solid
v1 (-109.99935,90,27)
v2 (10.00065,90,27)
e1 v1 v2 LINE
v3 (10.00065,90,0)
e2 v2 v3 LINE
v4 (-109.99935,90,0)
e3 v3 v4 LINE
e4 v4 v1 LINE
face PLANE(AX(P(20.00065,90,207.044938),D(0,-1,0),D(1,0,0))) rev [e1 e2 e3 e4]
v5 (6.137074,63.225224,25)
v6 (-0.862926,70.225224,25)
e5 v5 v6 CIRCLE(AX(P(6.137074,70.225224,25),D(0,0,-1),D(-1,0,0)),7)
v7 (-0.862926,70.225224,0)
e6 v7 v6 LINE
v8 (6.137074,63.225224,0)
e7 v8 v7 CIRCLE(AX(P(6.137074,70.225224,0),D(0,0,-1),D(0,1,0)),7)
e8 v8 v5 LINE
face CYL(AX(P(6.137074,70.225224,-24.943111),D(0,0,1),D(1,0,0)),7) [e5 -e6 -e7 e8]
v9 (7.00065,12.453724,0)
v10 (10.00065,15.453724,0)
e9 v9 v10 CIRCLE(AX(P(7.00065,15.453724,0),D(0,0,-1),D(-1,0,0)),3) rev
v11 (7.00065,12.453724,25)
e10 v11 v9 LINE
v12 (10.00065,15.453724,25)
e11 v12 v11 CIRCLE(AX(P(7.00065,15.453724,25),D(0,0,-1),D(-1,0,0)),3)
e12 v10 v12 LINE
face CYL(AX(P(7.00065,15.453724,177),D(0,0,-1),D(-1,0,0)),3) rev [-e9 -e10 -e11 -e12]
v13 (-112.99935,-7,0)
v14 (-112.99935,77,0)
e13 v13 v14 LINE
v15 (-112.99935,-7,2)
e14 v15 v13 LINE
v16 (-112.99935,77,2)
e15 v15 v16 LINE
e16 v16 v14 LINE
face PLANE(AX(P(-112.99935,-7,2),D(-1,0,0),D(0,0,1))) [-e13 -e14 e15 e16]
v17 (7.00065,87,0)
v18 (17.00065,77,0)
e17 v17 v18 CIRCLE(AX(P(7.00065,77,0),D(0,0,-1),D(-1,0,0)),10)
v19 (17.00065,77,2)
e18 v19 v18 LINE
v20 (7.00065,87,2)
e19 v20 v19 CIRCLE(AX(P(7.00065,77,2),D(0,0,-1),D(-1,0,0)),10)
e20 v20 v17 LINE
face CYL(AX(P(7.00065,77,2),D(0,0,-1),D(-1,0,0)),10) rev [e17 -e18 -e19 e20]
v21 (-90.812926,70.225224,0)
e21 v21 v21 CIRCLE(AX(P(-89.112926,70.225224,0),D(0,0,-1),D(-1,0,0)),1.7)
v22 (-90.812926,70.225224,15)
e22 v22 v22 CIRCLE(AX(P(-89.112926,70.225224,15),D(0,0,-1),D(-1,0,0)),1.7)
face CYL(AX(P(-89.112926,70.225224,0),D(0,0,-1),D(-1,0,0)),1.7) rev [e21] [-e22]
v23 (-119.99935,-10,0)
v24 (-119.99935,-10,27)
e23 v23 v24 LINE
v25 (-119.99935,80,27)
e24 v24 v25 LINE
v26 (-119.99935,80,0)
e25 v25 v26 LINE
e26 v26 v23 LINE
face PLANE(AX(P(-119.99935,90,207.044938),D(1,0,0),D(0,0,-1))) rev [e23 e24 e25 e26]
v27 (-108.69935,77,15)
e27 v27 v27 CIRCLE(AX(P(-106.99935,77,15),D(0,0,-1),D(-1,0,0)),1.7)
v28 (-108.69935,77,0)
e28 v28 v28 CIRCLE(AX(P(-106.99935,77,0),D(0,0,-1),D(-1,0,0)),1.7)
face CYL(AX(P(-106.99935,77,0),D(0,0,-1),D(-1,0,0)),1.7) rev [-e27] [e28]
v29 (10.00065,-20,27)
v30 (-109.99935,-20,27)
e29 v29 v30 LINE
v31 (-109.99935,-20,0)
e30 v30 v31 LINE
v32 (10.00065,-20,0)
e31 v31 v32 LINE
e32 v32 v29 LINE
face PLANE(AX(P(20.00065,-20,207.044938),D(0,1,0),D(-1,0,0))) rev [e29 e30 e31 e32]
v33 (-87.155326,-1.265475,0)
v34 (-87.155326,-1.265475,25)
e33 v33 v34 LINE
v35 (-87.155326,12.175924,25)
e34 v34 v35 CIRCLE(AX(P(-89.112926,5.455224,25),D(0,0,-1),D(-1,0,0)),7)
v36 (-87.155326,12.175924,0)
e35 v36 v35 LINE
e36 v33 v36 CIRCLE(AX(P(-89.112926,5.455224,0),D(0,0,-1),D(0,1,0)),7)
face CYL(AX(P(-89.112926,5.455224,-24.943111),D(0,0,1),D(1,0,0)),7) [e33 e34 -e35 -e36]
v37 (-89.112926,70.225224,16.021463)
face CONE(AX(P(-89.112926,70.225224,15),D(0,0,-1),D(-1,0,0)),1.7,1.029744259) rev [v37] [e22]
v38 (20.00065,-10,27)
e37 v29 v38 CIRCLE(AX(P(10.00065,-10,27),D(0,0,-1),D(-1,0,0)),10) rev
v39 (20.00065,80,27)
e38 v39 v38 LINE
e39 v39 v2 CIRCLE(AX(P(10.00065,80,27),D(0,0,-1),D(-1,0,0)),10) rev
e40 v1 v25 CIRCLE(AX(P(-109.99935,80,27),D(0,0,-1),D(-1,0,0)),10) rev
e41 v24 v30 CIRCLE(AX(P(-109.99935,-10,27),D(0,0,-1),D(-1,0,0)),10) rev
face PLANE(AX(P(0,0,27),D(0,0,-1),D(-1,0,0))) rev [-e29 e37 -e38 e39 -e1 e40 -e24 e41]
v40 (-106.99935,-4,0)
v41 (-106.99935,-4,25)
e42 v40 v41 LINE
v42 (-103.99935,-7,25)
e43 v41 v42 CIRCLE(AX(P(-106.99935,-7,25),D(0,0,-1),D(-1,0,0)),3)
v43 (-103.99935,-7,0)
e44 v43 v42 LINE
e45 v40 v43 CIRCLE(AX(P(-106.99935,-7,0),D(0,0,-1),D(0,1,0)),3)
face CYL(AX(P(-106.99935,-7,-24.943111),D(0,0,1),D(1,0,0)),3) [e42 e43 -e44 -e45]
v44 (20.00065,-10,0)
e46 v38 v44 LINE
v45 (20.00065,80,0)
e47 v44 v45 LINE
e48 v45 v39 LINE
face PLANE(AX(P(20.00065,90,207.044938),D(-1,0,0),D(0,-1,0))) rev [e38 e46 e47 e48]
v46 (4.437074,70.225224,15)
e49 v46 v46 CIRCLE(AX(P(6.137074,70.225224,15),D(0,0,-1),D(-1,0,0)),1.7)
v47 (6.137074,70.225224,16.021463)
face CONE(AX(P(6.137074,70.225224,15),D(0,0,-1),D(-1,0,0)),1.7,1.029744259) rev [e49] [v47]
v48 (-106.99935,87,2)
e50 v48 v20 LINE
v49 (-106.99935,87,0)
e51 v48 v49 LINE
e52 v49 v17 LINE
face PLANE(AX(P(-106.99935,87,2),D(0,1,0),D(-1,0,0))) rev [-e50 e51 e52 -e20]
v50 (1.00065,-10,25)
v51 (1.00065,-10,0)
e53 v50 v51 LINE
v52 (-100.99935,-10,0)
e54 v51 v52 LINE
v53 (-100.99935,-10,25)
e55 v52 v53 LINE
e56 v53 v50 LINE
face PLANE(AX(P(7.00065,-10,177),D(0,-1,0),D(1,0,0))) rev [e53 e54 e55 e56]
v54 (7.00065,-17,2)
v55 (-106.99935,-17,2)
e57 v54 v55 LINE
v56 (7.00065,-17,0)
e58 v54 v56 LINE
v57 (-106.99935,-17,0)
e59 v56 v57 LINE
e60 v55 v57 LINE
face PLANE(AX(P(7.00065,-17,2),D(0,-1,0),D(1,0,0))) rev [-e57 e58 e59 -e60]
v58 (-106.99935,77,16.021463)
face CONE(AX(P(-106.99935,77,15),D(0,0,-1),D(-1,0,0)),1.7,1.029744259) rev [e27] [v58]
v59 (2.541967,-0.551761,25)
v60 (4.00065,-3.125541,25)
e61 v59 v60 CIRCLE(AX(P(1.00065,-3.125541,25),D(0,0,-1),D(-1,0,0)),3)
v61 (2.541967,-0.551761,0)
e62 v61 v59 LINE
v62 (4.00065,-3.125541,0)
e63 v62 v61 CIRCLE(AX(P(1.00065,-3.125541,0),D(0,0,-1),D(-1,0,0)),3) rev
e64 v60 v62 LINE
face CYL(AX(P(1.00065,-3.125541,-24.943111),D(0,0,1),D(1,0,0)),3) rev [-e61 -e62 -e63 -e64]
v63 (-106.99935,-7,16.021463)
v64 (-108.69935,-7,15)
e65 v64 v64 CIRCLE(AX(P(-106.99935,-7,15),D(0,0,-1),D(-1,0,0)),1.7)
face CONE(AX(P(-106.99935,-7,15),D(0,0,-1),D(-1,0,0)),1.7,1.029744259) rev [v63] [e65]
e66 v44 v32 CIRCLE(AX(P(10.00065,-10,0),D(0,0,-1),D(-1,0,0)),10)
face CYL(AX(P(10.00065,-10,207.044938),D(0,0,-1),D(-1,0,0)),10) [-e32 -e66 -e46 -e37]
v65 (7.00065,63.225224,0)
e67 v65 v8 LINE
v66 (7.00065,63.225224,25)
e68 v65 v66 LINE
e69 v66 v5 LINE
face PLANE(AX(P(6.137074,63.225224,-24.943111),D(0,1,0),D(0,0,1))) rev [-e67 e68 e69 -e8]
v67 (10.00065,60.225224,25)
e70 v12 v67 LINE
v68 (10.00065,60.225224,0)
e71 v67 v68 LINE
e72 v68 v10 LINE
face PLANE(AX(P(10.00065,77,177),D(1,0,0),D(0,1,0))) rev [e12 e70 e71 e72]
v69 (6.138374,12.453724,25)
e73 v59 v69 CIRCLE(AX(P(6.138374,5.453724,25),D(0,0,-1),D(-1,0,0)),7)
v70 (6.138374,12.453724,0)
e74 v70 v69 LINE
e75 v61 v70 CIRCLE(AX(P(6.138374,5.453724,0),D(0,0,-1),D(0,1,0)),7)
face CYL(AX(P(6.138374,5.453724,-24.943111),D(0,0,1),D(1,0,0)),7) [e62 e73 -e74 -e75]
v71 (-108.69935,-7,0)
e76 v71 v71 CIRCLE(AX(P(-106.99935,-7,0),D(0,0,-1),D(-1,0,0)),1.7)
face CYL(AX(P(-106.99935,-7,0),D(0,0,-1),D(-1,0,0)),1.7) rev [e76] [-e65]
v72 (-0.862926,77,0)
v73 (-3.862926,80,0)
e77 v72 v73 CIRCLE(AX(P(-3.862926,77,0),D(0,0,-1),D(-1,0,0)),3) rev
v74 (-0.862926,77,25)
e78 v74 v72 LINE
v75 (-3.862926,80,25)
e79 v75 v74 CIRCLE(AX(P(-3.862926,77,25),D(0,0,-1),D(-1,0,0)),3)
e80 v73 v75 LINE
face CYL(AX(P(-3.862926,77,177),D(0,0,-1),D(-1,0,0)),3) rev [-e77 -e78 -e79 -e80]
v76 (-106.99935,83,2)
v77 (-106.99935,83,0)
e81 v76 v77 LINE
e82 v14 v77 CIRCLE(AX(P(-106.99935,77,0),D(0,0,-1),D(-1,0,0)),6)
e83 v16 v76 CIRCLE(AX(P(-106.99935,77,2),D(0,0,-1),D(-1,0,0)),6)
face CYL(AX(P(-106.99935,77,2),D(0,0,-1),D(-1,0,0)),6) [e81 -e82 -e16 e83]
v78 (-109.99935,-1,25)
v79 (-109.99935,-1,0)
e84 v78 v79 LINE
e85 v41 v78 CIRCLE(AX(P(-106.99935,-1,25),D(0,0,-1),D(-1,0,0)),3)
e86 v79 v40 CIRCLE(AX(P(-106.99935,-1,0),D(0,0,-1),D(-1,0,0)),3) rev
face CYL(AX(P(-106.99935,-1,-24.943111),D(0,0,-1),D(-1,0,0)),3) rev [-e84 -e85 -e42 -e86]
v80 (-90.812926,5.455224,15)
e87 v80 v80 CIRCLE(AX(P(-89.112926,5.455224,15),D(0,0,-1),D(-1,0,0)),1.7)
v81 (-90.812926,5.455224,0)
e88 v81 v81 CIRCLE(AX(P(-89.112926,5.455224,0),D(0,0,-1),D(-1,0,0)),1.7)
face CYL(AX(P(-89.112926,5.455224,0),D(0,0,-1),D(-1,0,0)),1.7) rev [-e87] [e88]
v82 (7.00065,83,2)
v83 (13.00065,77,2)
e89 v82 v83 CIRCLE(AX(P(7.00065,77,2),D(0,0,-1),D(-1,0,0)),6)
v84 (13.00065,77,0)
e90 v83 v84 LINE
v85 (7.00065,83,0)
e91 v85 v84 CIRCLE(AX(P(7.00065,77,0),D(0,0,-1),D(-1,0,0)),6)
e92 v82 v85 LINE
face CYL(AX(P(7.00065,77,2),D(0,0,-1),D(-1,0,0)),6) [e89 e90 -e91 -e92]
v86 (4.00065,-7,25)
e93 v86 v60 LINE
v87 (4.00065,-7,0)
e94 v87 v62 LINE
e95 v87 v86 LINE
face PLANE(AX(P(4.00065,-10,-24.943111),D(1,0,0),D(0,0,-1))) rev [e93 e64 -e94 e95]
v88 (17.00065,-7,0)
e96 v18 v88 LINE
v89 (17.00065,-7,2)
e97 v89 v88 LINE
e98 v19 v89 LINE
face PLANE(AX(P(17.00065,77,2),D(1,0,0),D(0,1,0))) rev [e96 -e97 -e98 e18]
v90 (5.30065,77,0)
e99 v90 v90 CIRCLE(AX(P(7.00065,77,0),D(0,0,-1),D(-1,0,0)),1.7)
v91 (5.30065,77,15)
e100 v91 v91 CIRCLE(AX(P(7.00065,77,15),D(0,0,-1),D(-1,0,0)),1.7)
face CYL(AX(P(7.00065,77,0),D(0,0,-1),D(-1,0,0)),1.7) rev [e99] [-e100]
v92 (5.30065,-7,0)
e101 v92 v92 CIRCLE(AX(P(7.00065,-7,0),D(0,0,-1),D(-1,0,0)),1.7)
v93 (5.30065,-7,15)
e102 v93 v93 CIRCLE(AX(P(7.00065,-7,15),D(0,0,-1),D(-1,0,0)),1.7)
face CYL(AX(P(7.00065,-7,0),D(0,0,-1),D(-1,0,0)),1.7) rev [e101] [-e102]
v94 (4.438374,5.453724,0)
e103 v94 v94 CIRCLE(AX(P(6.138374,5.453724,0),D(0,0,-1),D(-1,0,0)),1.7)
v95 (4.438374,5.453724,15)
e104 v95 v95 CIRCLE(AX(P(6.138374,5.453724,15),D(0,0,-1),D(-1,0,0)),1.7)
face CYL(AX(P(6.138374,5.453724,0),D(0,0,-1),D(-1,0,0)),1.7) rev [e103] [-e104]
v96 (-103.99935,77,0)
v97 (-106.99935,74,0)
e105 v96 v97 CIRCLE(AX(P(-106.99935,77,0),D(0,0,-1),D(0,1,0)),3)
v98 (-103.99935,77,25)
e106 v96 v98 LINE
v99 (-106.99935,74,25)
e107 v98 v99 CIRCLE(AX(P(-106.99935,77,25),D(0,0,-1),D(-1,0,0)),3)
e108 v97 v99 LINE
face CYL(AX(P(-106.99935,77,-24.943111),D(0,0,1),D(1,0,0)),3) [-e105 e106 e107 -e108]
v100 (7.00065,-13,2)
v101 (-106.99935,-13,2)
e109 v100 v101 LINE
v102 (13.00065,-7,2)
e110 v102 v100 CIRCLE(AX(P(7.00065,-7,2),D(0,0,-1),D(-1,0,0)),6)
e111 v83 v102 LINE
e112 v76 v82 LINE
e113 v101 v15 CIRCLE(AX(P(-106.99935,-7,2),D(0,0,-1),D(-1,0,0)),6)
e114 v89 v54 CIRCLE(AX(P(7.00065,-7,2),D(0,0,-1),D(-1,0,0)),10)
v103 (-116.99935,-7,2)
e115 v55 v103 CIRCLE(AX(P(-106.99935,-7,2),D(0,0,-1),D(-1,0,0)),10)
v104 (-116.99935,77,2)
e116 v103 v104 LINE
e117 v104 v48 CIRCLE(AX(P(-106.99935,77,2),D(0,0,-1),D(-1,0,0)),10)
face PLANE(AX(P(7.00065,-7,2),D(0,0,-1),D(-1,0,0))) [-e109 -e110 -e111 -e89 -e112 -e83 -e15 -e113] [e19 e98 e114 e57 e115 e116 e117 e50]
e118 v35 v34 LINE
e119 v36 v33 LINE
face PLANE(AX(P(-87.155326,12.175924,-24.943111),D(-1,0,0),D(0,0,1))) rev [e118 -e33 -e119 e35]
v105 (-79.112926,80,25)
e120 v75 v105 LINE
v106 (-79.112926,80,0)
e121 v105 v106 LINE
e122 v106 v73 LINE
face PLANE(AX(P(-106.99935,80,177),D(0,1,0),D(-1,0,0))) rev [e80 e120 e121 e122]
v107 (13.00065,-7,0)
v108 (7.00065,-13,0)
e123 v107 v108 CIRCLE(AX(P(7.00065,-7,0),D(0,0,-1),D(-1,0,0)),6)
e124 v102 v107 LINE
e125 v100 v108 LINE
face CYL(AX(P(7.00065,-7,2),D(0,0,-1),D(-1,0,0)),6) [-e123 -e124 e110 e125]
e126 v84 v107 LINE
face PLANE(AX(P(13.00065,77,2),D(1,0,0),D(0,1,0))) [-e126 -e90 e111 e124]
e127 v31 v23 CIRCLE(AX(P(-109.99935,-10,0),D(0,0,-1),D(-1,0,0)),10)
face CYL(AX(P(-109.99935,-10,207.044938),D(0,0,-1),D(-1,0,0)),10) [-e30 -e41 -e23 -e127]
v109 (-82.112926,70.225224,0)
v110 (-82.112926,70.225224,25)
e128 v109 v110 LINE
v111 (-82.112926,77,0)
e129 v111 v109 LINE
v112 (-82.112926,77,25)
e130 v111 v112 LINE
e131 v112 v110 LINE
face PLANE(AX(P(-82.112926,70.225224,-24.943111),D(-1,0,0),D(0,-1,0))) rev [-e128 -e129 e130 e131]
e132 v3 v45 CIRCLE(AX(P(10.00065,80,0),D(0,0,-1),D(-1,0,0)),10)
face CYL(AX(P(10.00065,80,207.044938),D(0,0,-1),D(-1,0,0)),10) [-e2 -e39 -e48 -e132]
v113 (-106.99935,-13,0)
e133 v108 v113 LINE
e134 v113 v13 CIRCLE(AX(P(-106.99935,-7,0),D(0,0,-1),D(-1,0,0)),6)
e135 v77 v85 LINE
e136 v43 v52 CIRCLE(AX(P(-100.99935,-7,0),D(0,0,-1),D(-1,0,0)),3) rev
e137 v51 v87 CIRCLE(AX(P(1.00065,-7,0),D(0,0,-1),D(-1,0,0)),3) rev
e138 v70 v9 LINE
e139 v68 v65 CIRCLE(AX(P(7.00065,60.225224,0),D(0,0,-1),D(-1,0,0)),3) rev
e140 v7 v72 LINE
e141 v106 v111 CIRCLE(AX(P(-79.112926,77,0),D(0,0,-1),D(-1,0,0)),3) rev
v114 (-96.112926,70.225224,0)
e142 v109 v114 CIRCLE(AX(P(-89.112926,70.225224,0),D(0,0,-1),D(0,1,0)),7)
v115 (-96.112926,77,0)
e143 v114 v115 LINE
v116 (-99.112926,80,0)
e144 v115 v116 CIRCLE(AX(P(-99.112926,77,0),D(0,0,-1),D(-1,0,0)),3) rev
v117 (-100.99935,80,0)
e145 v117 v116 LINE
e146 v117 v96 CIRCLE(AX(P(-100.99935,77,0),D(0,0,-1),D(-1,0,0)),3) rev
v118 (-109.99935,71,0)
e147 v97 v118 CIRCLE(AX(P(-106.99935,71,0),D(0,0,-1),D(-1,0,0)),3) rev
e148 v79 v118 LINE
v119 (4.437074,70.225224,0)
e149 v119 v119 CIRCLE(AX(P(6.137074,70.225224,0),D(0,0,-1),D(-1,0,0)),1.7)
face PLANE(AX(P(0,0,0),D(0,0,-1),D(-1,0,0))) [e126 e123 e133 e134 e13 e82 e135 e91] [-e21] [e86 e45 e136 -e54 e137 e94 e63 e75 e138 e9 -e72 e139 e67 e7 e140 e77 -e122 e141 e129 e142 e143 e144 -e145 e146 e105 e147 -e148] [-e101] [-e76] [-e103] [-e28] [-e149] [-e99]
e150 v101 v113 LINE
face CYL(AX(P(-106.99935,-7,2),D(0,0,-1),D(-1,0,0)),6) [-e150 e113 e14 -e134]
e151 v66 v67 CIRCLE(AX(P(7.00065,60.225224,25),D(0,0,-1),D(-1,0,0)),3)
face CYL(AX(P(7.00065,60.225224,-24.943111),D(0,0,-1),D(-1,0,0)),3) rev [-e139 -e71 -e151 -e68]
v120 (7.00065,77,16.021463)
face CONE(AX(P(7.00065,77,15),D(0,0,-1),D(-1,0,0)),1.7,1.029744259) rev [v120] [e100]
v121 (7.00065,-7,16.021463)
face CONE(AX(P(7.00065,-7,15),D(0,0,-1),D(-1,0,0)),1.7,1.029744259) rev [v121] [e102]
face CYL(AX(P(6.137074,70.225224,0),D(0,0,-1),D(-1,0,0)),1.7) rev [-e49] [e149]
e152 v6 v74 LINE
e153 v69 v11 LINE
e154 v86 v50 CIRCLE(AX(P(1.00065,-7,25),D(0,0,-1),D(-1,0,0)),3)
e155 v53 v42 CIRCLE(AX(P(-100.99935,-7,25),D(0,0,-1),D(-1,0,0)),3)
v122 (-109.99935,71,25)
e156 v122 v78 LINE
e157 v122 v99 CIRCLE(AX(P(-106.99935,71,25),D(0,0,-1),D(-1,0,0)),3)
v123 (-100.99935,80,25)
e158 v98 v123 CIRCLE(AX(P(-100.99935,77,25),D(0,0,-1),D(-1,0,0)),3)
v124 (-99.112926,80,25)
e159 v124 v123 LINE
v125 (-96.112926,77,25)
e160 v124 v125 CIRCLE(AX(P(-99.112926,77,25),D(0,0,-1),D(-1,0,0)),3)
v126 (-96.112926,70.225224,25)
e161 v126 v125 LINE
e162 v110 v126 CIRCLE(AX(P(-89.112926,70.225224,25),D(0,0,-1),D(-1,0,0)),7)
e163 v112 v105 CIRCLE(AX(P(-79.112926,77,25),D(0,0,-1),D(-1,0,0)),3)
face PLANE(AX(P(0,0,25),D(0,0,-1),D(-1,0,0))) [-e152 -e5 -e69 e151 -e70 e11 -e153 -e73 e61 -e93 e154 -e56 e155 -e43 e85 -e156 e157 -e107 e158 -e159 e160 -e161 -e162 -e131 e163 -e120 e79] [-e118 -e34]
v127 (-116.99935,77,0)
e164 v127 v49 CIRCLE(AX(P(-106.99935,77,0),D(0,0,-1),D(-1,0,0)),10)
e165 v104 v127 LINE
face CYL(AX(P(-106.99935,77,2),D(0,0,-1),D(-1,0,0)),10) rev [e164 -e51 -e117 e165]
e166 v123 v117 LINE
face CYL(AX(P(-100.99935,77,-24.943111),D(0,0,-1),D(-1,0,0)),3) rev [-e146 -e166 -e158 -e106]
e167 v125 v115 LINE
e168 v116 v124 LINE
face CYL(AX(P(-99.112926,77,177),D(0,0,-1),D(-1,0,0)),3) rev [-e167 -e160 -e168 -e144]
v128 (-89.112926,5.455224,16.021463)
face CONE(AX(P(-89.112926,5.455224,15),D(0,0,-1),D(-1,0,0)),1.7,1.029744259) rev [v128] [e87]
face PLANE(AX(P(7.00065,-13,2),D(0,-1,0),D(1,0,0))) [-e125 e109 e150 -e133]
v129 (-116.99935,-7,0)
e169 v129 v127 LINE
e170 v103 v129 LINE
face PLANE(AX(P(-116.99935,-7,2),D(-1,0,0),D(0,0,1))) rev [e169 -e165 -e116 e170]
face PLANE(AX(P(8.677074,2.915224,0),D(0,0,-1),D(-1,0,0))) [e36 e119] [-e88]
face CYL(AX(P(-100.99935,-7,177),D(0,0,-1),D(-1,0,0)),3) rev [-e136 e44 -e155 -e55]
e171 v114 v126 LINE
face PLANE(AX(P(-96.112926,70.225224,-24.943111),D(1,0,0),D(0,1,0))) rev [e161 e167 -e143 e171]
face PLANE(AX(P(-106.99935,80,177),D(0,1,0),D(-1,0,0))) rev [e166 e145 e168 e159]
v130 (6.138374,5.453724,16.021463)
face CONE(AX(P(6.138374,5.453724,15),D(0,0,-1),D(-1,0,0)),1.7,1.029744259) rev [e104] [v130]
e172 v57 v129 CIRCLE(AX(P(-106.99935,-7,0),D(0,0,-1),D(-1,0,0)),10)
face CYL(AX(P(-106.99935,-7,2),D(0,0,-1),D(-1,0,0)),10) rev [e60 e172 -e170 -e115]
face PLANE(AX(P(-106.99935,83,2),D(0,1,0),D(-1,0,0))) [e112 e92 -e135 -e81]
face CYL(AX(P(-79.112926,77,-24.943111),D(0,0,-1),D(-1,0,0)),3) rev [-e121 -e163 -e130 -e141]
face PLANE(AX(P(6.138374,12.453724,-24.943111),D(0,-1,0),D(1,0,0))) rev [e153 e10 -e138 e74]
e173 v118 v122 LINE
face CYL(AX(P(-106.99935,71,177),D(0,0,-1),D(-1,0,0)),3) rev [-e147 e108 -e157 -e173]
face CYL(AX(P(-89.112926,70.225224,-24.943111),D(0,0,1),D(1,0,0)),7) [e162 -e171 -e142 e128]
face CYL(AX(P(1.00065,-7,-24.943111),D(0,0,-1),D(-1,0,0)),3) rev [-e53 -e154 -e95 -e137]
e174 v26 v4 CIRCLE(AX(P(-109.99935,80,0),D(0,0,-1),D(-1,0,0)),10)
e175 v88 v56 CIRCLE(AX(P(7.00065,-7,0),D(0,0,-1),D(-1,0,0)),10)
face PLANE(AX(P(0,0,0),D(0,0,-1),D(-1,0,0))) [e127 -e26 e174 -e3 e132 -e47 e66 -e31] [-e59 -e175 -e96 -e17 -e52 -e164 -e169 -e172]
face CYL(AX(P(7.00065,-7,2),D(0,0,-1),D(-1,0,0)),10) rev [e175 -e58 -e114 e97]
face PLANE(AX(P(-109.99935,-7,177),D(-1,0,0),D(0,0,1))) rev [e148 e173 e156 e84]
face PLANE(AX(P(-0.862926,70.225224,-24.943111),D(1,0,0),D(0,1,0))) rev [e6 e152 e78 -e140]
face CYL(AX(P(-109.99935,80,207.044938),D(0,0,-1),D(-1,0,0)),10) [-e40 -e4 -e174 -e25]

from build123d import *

# Parameters (mm, degrees)
SKETCH1_W                = 140
SKETCH1_H                = 110
BOSS_EXTRUDE1_DEPTH      = 27
FILLET1_R                = 10
CUT_EXTRUDE1_DEPTH       = 25
CUT_EXTRUDE2_DEPTH       = 2
BOSS_EXTRUDE2_START      = 25
BOSS_EXTRUDE2_DEPTH      = 25
FILLET2_R                = 3
M3_CLEARANCE_HOLE1_D     = 3.4
M3_CLEARANCE_HOLE1_DEPTH = 15
M3_CLEARANCE_HOLE1_TIP   = 1.021463052
FILLET3_R                = 3


with BuildPart() as part:
    # Sketch1 → Boss-Extrude1 (new body)
    with BuildSketch(Plane.XY):
        with Locations((-49.99935, 35)):
            Rectangle(SKETCH1_W, SKETCH1_H)
    extrude(amount=BOSS_EXTRUDE1_DEPTH)

    # Fillet1
    fillet1_edges = [part.edges().sort_by_distance(p)[0] for p in [
        (20.00065, -20, 13.5),
        (-119.99935, -20, 13.5),
        (-119.99935, 90, 13.5),
        (20.00065, 90, 13.5),
    ]]
    fillet(fillet1_edges, radius=FILLET1_R)

    # Sketch3 → Cut-Extrude1 (cut)
    with BuildSketch(Plane(origin=(0, 0, 0), x_dir=(-1, 0, 0), z_dir=(0, 0, -1))):
        with BuildLine():
            Line((106.99935, 80), (-7.00065, 80))
            ThreePointArc((-7.00065, 80), (-9.121970344, 79.121320344), (-10.00065, 77))
            Line((-10.00065, 77), (-10.00065, -7))
            ThreePointArc((-10.00065, -7), (-9.121970344, -9.121320344), (-7.00065, -10))
            Line((-7.00065, -10), (106.99935, -10))
            ThreePointArc((106.99935, -10), (109.120670344, -9.121320344), (109.99935, -7))
            Line((109.99935, -7), (109.99935, 77))
            ThreePointArc((109.99935, 77), (109.120670344, 79.121320344), (106.99935, 80))
        make_face()
    extrude(amount=-CUT_EXTRUDE1_DEPTH, mode=Mode.SUBTRACT)

    # Sketch5 → Cut-Extrude2 (cut)
    with BuildSketch(Plane(origin=(0, 0, 0), x_dir=(-1, 0, 0), z_dir=(0, 0, -1))):
        with BuildLine():
            Line((-7.00065, -17), (106.99935, -17))
            ThreePointArc((106.99935, -17), (114.070417812, -14.071067812), (116.99935, -7))
            Line((116.99935, -7), (116.99935, 77))
            ThreePointArc((116.99935, 77), (114.070417812, 84.071067812), (106.99935, 87))
            Line((106.99935, 87), (-7.00065, 87))
            ThreePointArc((-7.00065, 87), (-14.071717812, 84.071067812), (-17.00065, 77))
            Line((-17.00065, 77), (-17.00065, -7))
            ThreePointArc((-17.00065, -7), (-14.071717812, -14.071067812), (-7.00065, -17))
        make_face()
        with BuildLine():
            Line((-7.00065, -13), (106.99935, -13))
            ThreePointArc((106.99935, -13), (111.241990687, -11.242640687), (112.99935, -7))
            Line((112.99935, -7), (112.99935, 77))
            ThreePointArc((112.99935, 77), (111.241990687, 81.242640687), (106.99935, 83))
            Line((106.99935, 83), (-7.00065, 83))
            ThreePointArc((-7.00065, 83), (-11.243290687, 81.242640687), (-13.00065, 77))
            Line((-13.00065, 77), (-13.00065, -7))
            ThreePointArc((-13.00065, -7), (-11.243290687, -11.242640687), (-7.00065, -13))
        make_face(mode=Mode.SUBTRACT)
    extrude(amount=-CUT_EXTRUDE2_DEPTH, mode=Mode.SUBTRACT)

    # Sketch6 → Boss-Extrude2 (add)
    with BuildSketch(Plane(origin=(0, 0, 25), x_dir=(-1, 0, 0), z_dir=(0, 0, -1)).offset(BOSS_EXTRUDE2_START)):
        with BuildLine():
            Line((0.862925656, 70.225224344), (0.862925656, 80))
            Line((0.862925656, 80), (-7.00065, 80))
            ThreePointArc((-7.00065, 80), (-9.121970344, 79.121320344), (-10.00065, 77))
            Line((-10.00065, 77), (-10.00065, 63.225224344))
            Line((-10.00065, 63.225224344), (-6.137074344, 63.225224344))
            ThreePointArc((-6.137074344, 63.225224344), (-1.187326876, 65.275476876), (0.862925656, 70.225224344))
        make_face()
        with BuildLine():
            Line((82.112925656, 70.225224344), (82.112925656, 80))
            Line((82.112925656, 80), (96.112925656, 80))
            Line((96.112925656, 80), (96.112925656, 70.225224344))
            ThreePointArc((96.112925656, 70.225224344), (89.112925656, 63.225224344), (82.112925656, 70.225224344))
        make_face()
        with BuildLine():
            Line((-10.00065, 12.453724344), (-10.00065, -1.546275656))
            Line((-10.00065, -1.546275656), (-10.00065, -7))
            ThreePointArc((-10.00065, -7), (-9.121970344, -9.121320344), (-7.00065, -10))
            Line((-7.00065, -10), (-4.00065, -10))
            Line((-4.00065, -10), (-4.00065, -1.211868999))
            ThreePointArc((-4.00065, -1.211868999), (0.777518707, 6.535585378), (-6.138374344, 12.453724344))
            Line((-6.138374344, 12.453724344), (-10.00065, 12.453724344))
        make_face()
        with BuildLine():
            Line((87.155325656, 12.175923879), (87.155325656, -1.265475191))
            ThreePointArc((87.155325656, -1.265475191), (96.112925656, 5.455224344), (87.155325656, 12.175923879))
        make_face()
        with BuildLine():
            Line((106.99935, 74), (109.99935, 74))
            Line((109.99935, 74), (109.99935, 77))
            ThreePointArc((109.99935, 77), (109.120670344, 79.121320344), (106.99935, 80))
            Line((106.99935, 80), (103.99935, 80))
            Line((103.99935, 80), (103.99935, 77))
            ThreePointArc((103.99935, 77), (104.878029656, 74.878679656), (106.99935, 74))
        make_face()
        with BuildLine():
            Line((103.99935, -7), (103.99935, -10))
            Line((103.99935, -10), (106.99935, -10))
            ThreePointArc((106.99935, -10), (109.120670344, -9.121320344), (109.99935, -7))
            Line((109.99935, -7), (109.99935, -4))
            Line((109.99935, -4), (106.99935, -4))
            ThreePointArc((106.99935, -4), (104.878029656, -4.878679656), (103.99935, -7))
        make_face()
    extrude(amount=-BOSS_EXTRUDE2_DEPTH)

    # Fillet2
    fillet2_edges = [part.edges().sort_by_distance(p)[0] for p in [
        (-0.862925656, 80, 12.5),
        (10.00065, 63.225224344, 12.5),
        (-96.112925656, 80, 12.5),
        (-82.112925656, 80, 12.5),
        (4.00065, -1.211868999, 12.5),
        (10.00065, 12.453724344, 12.5),
    ]]
    fillet(fillet2_edges, radius=FILLET2_R)

    # M3 Clearance Hole1
    with Locations(Plane(origin=(0, 0, 0), x_dir=(-1, 0, 0), z_dir=(0, 0, -1))):
        with Locations((-6.137074344, 70.225224344), (89.112925656, 70.225224344), (89.112925656, 5.455224344), (-6.138374344, 5.453724344), (-7.00065, 77), (106.99935, 77), (106.99935, -7), (-7.00065, -7)):
            Hole(M3_CLEARANCE_HOLE1_D / 2, depth=M3_CLEARANCE_HOLE1_DEPTH)
            with Locations((0, 0, -(M3_CLEARANCE_HOLE1_DEPTH + M3_CLEARANCE_HOLE1_TIP / 2))):  # 118° drill point
                Cone(0, M3_CLEARANCE_HOLE1_D / 2, M3_CLEARANCE_HOLE1_TIP, mode=Mode.SUBTRACT)

    # Fillet3
    fillet3_edges = [part.edges().sort_by_distance(p)[0] for p in [
        (-109.99935, 74, 12.5),
        (-103.99935, 80, 12.5),
        (-109.99935, -4, 12.5),
        (-103.99935, -10, 12.5),
        (4.00065, -10, 12.5),
    ]]
    fillet(fillet3_edges, radius=FILLET3_R - 0.0001)  # a hair under: the kernel refuses the full size


solid = part.part
